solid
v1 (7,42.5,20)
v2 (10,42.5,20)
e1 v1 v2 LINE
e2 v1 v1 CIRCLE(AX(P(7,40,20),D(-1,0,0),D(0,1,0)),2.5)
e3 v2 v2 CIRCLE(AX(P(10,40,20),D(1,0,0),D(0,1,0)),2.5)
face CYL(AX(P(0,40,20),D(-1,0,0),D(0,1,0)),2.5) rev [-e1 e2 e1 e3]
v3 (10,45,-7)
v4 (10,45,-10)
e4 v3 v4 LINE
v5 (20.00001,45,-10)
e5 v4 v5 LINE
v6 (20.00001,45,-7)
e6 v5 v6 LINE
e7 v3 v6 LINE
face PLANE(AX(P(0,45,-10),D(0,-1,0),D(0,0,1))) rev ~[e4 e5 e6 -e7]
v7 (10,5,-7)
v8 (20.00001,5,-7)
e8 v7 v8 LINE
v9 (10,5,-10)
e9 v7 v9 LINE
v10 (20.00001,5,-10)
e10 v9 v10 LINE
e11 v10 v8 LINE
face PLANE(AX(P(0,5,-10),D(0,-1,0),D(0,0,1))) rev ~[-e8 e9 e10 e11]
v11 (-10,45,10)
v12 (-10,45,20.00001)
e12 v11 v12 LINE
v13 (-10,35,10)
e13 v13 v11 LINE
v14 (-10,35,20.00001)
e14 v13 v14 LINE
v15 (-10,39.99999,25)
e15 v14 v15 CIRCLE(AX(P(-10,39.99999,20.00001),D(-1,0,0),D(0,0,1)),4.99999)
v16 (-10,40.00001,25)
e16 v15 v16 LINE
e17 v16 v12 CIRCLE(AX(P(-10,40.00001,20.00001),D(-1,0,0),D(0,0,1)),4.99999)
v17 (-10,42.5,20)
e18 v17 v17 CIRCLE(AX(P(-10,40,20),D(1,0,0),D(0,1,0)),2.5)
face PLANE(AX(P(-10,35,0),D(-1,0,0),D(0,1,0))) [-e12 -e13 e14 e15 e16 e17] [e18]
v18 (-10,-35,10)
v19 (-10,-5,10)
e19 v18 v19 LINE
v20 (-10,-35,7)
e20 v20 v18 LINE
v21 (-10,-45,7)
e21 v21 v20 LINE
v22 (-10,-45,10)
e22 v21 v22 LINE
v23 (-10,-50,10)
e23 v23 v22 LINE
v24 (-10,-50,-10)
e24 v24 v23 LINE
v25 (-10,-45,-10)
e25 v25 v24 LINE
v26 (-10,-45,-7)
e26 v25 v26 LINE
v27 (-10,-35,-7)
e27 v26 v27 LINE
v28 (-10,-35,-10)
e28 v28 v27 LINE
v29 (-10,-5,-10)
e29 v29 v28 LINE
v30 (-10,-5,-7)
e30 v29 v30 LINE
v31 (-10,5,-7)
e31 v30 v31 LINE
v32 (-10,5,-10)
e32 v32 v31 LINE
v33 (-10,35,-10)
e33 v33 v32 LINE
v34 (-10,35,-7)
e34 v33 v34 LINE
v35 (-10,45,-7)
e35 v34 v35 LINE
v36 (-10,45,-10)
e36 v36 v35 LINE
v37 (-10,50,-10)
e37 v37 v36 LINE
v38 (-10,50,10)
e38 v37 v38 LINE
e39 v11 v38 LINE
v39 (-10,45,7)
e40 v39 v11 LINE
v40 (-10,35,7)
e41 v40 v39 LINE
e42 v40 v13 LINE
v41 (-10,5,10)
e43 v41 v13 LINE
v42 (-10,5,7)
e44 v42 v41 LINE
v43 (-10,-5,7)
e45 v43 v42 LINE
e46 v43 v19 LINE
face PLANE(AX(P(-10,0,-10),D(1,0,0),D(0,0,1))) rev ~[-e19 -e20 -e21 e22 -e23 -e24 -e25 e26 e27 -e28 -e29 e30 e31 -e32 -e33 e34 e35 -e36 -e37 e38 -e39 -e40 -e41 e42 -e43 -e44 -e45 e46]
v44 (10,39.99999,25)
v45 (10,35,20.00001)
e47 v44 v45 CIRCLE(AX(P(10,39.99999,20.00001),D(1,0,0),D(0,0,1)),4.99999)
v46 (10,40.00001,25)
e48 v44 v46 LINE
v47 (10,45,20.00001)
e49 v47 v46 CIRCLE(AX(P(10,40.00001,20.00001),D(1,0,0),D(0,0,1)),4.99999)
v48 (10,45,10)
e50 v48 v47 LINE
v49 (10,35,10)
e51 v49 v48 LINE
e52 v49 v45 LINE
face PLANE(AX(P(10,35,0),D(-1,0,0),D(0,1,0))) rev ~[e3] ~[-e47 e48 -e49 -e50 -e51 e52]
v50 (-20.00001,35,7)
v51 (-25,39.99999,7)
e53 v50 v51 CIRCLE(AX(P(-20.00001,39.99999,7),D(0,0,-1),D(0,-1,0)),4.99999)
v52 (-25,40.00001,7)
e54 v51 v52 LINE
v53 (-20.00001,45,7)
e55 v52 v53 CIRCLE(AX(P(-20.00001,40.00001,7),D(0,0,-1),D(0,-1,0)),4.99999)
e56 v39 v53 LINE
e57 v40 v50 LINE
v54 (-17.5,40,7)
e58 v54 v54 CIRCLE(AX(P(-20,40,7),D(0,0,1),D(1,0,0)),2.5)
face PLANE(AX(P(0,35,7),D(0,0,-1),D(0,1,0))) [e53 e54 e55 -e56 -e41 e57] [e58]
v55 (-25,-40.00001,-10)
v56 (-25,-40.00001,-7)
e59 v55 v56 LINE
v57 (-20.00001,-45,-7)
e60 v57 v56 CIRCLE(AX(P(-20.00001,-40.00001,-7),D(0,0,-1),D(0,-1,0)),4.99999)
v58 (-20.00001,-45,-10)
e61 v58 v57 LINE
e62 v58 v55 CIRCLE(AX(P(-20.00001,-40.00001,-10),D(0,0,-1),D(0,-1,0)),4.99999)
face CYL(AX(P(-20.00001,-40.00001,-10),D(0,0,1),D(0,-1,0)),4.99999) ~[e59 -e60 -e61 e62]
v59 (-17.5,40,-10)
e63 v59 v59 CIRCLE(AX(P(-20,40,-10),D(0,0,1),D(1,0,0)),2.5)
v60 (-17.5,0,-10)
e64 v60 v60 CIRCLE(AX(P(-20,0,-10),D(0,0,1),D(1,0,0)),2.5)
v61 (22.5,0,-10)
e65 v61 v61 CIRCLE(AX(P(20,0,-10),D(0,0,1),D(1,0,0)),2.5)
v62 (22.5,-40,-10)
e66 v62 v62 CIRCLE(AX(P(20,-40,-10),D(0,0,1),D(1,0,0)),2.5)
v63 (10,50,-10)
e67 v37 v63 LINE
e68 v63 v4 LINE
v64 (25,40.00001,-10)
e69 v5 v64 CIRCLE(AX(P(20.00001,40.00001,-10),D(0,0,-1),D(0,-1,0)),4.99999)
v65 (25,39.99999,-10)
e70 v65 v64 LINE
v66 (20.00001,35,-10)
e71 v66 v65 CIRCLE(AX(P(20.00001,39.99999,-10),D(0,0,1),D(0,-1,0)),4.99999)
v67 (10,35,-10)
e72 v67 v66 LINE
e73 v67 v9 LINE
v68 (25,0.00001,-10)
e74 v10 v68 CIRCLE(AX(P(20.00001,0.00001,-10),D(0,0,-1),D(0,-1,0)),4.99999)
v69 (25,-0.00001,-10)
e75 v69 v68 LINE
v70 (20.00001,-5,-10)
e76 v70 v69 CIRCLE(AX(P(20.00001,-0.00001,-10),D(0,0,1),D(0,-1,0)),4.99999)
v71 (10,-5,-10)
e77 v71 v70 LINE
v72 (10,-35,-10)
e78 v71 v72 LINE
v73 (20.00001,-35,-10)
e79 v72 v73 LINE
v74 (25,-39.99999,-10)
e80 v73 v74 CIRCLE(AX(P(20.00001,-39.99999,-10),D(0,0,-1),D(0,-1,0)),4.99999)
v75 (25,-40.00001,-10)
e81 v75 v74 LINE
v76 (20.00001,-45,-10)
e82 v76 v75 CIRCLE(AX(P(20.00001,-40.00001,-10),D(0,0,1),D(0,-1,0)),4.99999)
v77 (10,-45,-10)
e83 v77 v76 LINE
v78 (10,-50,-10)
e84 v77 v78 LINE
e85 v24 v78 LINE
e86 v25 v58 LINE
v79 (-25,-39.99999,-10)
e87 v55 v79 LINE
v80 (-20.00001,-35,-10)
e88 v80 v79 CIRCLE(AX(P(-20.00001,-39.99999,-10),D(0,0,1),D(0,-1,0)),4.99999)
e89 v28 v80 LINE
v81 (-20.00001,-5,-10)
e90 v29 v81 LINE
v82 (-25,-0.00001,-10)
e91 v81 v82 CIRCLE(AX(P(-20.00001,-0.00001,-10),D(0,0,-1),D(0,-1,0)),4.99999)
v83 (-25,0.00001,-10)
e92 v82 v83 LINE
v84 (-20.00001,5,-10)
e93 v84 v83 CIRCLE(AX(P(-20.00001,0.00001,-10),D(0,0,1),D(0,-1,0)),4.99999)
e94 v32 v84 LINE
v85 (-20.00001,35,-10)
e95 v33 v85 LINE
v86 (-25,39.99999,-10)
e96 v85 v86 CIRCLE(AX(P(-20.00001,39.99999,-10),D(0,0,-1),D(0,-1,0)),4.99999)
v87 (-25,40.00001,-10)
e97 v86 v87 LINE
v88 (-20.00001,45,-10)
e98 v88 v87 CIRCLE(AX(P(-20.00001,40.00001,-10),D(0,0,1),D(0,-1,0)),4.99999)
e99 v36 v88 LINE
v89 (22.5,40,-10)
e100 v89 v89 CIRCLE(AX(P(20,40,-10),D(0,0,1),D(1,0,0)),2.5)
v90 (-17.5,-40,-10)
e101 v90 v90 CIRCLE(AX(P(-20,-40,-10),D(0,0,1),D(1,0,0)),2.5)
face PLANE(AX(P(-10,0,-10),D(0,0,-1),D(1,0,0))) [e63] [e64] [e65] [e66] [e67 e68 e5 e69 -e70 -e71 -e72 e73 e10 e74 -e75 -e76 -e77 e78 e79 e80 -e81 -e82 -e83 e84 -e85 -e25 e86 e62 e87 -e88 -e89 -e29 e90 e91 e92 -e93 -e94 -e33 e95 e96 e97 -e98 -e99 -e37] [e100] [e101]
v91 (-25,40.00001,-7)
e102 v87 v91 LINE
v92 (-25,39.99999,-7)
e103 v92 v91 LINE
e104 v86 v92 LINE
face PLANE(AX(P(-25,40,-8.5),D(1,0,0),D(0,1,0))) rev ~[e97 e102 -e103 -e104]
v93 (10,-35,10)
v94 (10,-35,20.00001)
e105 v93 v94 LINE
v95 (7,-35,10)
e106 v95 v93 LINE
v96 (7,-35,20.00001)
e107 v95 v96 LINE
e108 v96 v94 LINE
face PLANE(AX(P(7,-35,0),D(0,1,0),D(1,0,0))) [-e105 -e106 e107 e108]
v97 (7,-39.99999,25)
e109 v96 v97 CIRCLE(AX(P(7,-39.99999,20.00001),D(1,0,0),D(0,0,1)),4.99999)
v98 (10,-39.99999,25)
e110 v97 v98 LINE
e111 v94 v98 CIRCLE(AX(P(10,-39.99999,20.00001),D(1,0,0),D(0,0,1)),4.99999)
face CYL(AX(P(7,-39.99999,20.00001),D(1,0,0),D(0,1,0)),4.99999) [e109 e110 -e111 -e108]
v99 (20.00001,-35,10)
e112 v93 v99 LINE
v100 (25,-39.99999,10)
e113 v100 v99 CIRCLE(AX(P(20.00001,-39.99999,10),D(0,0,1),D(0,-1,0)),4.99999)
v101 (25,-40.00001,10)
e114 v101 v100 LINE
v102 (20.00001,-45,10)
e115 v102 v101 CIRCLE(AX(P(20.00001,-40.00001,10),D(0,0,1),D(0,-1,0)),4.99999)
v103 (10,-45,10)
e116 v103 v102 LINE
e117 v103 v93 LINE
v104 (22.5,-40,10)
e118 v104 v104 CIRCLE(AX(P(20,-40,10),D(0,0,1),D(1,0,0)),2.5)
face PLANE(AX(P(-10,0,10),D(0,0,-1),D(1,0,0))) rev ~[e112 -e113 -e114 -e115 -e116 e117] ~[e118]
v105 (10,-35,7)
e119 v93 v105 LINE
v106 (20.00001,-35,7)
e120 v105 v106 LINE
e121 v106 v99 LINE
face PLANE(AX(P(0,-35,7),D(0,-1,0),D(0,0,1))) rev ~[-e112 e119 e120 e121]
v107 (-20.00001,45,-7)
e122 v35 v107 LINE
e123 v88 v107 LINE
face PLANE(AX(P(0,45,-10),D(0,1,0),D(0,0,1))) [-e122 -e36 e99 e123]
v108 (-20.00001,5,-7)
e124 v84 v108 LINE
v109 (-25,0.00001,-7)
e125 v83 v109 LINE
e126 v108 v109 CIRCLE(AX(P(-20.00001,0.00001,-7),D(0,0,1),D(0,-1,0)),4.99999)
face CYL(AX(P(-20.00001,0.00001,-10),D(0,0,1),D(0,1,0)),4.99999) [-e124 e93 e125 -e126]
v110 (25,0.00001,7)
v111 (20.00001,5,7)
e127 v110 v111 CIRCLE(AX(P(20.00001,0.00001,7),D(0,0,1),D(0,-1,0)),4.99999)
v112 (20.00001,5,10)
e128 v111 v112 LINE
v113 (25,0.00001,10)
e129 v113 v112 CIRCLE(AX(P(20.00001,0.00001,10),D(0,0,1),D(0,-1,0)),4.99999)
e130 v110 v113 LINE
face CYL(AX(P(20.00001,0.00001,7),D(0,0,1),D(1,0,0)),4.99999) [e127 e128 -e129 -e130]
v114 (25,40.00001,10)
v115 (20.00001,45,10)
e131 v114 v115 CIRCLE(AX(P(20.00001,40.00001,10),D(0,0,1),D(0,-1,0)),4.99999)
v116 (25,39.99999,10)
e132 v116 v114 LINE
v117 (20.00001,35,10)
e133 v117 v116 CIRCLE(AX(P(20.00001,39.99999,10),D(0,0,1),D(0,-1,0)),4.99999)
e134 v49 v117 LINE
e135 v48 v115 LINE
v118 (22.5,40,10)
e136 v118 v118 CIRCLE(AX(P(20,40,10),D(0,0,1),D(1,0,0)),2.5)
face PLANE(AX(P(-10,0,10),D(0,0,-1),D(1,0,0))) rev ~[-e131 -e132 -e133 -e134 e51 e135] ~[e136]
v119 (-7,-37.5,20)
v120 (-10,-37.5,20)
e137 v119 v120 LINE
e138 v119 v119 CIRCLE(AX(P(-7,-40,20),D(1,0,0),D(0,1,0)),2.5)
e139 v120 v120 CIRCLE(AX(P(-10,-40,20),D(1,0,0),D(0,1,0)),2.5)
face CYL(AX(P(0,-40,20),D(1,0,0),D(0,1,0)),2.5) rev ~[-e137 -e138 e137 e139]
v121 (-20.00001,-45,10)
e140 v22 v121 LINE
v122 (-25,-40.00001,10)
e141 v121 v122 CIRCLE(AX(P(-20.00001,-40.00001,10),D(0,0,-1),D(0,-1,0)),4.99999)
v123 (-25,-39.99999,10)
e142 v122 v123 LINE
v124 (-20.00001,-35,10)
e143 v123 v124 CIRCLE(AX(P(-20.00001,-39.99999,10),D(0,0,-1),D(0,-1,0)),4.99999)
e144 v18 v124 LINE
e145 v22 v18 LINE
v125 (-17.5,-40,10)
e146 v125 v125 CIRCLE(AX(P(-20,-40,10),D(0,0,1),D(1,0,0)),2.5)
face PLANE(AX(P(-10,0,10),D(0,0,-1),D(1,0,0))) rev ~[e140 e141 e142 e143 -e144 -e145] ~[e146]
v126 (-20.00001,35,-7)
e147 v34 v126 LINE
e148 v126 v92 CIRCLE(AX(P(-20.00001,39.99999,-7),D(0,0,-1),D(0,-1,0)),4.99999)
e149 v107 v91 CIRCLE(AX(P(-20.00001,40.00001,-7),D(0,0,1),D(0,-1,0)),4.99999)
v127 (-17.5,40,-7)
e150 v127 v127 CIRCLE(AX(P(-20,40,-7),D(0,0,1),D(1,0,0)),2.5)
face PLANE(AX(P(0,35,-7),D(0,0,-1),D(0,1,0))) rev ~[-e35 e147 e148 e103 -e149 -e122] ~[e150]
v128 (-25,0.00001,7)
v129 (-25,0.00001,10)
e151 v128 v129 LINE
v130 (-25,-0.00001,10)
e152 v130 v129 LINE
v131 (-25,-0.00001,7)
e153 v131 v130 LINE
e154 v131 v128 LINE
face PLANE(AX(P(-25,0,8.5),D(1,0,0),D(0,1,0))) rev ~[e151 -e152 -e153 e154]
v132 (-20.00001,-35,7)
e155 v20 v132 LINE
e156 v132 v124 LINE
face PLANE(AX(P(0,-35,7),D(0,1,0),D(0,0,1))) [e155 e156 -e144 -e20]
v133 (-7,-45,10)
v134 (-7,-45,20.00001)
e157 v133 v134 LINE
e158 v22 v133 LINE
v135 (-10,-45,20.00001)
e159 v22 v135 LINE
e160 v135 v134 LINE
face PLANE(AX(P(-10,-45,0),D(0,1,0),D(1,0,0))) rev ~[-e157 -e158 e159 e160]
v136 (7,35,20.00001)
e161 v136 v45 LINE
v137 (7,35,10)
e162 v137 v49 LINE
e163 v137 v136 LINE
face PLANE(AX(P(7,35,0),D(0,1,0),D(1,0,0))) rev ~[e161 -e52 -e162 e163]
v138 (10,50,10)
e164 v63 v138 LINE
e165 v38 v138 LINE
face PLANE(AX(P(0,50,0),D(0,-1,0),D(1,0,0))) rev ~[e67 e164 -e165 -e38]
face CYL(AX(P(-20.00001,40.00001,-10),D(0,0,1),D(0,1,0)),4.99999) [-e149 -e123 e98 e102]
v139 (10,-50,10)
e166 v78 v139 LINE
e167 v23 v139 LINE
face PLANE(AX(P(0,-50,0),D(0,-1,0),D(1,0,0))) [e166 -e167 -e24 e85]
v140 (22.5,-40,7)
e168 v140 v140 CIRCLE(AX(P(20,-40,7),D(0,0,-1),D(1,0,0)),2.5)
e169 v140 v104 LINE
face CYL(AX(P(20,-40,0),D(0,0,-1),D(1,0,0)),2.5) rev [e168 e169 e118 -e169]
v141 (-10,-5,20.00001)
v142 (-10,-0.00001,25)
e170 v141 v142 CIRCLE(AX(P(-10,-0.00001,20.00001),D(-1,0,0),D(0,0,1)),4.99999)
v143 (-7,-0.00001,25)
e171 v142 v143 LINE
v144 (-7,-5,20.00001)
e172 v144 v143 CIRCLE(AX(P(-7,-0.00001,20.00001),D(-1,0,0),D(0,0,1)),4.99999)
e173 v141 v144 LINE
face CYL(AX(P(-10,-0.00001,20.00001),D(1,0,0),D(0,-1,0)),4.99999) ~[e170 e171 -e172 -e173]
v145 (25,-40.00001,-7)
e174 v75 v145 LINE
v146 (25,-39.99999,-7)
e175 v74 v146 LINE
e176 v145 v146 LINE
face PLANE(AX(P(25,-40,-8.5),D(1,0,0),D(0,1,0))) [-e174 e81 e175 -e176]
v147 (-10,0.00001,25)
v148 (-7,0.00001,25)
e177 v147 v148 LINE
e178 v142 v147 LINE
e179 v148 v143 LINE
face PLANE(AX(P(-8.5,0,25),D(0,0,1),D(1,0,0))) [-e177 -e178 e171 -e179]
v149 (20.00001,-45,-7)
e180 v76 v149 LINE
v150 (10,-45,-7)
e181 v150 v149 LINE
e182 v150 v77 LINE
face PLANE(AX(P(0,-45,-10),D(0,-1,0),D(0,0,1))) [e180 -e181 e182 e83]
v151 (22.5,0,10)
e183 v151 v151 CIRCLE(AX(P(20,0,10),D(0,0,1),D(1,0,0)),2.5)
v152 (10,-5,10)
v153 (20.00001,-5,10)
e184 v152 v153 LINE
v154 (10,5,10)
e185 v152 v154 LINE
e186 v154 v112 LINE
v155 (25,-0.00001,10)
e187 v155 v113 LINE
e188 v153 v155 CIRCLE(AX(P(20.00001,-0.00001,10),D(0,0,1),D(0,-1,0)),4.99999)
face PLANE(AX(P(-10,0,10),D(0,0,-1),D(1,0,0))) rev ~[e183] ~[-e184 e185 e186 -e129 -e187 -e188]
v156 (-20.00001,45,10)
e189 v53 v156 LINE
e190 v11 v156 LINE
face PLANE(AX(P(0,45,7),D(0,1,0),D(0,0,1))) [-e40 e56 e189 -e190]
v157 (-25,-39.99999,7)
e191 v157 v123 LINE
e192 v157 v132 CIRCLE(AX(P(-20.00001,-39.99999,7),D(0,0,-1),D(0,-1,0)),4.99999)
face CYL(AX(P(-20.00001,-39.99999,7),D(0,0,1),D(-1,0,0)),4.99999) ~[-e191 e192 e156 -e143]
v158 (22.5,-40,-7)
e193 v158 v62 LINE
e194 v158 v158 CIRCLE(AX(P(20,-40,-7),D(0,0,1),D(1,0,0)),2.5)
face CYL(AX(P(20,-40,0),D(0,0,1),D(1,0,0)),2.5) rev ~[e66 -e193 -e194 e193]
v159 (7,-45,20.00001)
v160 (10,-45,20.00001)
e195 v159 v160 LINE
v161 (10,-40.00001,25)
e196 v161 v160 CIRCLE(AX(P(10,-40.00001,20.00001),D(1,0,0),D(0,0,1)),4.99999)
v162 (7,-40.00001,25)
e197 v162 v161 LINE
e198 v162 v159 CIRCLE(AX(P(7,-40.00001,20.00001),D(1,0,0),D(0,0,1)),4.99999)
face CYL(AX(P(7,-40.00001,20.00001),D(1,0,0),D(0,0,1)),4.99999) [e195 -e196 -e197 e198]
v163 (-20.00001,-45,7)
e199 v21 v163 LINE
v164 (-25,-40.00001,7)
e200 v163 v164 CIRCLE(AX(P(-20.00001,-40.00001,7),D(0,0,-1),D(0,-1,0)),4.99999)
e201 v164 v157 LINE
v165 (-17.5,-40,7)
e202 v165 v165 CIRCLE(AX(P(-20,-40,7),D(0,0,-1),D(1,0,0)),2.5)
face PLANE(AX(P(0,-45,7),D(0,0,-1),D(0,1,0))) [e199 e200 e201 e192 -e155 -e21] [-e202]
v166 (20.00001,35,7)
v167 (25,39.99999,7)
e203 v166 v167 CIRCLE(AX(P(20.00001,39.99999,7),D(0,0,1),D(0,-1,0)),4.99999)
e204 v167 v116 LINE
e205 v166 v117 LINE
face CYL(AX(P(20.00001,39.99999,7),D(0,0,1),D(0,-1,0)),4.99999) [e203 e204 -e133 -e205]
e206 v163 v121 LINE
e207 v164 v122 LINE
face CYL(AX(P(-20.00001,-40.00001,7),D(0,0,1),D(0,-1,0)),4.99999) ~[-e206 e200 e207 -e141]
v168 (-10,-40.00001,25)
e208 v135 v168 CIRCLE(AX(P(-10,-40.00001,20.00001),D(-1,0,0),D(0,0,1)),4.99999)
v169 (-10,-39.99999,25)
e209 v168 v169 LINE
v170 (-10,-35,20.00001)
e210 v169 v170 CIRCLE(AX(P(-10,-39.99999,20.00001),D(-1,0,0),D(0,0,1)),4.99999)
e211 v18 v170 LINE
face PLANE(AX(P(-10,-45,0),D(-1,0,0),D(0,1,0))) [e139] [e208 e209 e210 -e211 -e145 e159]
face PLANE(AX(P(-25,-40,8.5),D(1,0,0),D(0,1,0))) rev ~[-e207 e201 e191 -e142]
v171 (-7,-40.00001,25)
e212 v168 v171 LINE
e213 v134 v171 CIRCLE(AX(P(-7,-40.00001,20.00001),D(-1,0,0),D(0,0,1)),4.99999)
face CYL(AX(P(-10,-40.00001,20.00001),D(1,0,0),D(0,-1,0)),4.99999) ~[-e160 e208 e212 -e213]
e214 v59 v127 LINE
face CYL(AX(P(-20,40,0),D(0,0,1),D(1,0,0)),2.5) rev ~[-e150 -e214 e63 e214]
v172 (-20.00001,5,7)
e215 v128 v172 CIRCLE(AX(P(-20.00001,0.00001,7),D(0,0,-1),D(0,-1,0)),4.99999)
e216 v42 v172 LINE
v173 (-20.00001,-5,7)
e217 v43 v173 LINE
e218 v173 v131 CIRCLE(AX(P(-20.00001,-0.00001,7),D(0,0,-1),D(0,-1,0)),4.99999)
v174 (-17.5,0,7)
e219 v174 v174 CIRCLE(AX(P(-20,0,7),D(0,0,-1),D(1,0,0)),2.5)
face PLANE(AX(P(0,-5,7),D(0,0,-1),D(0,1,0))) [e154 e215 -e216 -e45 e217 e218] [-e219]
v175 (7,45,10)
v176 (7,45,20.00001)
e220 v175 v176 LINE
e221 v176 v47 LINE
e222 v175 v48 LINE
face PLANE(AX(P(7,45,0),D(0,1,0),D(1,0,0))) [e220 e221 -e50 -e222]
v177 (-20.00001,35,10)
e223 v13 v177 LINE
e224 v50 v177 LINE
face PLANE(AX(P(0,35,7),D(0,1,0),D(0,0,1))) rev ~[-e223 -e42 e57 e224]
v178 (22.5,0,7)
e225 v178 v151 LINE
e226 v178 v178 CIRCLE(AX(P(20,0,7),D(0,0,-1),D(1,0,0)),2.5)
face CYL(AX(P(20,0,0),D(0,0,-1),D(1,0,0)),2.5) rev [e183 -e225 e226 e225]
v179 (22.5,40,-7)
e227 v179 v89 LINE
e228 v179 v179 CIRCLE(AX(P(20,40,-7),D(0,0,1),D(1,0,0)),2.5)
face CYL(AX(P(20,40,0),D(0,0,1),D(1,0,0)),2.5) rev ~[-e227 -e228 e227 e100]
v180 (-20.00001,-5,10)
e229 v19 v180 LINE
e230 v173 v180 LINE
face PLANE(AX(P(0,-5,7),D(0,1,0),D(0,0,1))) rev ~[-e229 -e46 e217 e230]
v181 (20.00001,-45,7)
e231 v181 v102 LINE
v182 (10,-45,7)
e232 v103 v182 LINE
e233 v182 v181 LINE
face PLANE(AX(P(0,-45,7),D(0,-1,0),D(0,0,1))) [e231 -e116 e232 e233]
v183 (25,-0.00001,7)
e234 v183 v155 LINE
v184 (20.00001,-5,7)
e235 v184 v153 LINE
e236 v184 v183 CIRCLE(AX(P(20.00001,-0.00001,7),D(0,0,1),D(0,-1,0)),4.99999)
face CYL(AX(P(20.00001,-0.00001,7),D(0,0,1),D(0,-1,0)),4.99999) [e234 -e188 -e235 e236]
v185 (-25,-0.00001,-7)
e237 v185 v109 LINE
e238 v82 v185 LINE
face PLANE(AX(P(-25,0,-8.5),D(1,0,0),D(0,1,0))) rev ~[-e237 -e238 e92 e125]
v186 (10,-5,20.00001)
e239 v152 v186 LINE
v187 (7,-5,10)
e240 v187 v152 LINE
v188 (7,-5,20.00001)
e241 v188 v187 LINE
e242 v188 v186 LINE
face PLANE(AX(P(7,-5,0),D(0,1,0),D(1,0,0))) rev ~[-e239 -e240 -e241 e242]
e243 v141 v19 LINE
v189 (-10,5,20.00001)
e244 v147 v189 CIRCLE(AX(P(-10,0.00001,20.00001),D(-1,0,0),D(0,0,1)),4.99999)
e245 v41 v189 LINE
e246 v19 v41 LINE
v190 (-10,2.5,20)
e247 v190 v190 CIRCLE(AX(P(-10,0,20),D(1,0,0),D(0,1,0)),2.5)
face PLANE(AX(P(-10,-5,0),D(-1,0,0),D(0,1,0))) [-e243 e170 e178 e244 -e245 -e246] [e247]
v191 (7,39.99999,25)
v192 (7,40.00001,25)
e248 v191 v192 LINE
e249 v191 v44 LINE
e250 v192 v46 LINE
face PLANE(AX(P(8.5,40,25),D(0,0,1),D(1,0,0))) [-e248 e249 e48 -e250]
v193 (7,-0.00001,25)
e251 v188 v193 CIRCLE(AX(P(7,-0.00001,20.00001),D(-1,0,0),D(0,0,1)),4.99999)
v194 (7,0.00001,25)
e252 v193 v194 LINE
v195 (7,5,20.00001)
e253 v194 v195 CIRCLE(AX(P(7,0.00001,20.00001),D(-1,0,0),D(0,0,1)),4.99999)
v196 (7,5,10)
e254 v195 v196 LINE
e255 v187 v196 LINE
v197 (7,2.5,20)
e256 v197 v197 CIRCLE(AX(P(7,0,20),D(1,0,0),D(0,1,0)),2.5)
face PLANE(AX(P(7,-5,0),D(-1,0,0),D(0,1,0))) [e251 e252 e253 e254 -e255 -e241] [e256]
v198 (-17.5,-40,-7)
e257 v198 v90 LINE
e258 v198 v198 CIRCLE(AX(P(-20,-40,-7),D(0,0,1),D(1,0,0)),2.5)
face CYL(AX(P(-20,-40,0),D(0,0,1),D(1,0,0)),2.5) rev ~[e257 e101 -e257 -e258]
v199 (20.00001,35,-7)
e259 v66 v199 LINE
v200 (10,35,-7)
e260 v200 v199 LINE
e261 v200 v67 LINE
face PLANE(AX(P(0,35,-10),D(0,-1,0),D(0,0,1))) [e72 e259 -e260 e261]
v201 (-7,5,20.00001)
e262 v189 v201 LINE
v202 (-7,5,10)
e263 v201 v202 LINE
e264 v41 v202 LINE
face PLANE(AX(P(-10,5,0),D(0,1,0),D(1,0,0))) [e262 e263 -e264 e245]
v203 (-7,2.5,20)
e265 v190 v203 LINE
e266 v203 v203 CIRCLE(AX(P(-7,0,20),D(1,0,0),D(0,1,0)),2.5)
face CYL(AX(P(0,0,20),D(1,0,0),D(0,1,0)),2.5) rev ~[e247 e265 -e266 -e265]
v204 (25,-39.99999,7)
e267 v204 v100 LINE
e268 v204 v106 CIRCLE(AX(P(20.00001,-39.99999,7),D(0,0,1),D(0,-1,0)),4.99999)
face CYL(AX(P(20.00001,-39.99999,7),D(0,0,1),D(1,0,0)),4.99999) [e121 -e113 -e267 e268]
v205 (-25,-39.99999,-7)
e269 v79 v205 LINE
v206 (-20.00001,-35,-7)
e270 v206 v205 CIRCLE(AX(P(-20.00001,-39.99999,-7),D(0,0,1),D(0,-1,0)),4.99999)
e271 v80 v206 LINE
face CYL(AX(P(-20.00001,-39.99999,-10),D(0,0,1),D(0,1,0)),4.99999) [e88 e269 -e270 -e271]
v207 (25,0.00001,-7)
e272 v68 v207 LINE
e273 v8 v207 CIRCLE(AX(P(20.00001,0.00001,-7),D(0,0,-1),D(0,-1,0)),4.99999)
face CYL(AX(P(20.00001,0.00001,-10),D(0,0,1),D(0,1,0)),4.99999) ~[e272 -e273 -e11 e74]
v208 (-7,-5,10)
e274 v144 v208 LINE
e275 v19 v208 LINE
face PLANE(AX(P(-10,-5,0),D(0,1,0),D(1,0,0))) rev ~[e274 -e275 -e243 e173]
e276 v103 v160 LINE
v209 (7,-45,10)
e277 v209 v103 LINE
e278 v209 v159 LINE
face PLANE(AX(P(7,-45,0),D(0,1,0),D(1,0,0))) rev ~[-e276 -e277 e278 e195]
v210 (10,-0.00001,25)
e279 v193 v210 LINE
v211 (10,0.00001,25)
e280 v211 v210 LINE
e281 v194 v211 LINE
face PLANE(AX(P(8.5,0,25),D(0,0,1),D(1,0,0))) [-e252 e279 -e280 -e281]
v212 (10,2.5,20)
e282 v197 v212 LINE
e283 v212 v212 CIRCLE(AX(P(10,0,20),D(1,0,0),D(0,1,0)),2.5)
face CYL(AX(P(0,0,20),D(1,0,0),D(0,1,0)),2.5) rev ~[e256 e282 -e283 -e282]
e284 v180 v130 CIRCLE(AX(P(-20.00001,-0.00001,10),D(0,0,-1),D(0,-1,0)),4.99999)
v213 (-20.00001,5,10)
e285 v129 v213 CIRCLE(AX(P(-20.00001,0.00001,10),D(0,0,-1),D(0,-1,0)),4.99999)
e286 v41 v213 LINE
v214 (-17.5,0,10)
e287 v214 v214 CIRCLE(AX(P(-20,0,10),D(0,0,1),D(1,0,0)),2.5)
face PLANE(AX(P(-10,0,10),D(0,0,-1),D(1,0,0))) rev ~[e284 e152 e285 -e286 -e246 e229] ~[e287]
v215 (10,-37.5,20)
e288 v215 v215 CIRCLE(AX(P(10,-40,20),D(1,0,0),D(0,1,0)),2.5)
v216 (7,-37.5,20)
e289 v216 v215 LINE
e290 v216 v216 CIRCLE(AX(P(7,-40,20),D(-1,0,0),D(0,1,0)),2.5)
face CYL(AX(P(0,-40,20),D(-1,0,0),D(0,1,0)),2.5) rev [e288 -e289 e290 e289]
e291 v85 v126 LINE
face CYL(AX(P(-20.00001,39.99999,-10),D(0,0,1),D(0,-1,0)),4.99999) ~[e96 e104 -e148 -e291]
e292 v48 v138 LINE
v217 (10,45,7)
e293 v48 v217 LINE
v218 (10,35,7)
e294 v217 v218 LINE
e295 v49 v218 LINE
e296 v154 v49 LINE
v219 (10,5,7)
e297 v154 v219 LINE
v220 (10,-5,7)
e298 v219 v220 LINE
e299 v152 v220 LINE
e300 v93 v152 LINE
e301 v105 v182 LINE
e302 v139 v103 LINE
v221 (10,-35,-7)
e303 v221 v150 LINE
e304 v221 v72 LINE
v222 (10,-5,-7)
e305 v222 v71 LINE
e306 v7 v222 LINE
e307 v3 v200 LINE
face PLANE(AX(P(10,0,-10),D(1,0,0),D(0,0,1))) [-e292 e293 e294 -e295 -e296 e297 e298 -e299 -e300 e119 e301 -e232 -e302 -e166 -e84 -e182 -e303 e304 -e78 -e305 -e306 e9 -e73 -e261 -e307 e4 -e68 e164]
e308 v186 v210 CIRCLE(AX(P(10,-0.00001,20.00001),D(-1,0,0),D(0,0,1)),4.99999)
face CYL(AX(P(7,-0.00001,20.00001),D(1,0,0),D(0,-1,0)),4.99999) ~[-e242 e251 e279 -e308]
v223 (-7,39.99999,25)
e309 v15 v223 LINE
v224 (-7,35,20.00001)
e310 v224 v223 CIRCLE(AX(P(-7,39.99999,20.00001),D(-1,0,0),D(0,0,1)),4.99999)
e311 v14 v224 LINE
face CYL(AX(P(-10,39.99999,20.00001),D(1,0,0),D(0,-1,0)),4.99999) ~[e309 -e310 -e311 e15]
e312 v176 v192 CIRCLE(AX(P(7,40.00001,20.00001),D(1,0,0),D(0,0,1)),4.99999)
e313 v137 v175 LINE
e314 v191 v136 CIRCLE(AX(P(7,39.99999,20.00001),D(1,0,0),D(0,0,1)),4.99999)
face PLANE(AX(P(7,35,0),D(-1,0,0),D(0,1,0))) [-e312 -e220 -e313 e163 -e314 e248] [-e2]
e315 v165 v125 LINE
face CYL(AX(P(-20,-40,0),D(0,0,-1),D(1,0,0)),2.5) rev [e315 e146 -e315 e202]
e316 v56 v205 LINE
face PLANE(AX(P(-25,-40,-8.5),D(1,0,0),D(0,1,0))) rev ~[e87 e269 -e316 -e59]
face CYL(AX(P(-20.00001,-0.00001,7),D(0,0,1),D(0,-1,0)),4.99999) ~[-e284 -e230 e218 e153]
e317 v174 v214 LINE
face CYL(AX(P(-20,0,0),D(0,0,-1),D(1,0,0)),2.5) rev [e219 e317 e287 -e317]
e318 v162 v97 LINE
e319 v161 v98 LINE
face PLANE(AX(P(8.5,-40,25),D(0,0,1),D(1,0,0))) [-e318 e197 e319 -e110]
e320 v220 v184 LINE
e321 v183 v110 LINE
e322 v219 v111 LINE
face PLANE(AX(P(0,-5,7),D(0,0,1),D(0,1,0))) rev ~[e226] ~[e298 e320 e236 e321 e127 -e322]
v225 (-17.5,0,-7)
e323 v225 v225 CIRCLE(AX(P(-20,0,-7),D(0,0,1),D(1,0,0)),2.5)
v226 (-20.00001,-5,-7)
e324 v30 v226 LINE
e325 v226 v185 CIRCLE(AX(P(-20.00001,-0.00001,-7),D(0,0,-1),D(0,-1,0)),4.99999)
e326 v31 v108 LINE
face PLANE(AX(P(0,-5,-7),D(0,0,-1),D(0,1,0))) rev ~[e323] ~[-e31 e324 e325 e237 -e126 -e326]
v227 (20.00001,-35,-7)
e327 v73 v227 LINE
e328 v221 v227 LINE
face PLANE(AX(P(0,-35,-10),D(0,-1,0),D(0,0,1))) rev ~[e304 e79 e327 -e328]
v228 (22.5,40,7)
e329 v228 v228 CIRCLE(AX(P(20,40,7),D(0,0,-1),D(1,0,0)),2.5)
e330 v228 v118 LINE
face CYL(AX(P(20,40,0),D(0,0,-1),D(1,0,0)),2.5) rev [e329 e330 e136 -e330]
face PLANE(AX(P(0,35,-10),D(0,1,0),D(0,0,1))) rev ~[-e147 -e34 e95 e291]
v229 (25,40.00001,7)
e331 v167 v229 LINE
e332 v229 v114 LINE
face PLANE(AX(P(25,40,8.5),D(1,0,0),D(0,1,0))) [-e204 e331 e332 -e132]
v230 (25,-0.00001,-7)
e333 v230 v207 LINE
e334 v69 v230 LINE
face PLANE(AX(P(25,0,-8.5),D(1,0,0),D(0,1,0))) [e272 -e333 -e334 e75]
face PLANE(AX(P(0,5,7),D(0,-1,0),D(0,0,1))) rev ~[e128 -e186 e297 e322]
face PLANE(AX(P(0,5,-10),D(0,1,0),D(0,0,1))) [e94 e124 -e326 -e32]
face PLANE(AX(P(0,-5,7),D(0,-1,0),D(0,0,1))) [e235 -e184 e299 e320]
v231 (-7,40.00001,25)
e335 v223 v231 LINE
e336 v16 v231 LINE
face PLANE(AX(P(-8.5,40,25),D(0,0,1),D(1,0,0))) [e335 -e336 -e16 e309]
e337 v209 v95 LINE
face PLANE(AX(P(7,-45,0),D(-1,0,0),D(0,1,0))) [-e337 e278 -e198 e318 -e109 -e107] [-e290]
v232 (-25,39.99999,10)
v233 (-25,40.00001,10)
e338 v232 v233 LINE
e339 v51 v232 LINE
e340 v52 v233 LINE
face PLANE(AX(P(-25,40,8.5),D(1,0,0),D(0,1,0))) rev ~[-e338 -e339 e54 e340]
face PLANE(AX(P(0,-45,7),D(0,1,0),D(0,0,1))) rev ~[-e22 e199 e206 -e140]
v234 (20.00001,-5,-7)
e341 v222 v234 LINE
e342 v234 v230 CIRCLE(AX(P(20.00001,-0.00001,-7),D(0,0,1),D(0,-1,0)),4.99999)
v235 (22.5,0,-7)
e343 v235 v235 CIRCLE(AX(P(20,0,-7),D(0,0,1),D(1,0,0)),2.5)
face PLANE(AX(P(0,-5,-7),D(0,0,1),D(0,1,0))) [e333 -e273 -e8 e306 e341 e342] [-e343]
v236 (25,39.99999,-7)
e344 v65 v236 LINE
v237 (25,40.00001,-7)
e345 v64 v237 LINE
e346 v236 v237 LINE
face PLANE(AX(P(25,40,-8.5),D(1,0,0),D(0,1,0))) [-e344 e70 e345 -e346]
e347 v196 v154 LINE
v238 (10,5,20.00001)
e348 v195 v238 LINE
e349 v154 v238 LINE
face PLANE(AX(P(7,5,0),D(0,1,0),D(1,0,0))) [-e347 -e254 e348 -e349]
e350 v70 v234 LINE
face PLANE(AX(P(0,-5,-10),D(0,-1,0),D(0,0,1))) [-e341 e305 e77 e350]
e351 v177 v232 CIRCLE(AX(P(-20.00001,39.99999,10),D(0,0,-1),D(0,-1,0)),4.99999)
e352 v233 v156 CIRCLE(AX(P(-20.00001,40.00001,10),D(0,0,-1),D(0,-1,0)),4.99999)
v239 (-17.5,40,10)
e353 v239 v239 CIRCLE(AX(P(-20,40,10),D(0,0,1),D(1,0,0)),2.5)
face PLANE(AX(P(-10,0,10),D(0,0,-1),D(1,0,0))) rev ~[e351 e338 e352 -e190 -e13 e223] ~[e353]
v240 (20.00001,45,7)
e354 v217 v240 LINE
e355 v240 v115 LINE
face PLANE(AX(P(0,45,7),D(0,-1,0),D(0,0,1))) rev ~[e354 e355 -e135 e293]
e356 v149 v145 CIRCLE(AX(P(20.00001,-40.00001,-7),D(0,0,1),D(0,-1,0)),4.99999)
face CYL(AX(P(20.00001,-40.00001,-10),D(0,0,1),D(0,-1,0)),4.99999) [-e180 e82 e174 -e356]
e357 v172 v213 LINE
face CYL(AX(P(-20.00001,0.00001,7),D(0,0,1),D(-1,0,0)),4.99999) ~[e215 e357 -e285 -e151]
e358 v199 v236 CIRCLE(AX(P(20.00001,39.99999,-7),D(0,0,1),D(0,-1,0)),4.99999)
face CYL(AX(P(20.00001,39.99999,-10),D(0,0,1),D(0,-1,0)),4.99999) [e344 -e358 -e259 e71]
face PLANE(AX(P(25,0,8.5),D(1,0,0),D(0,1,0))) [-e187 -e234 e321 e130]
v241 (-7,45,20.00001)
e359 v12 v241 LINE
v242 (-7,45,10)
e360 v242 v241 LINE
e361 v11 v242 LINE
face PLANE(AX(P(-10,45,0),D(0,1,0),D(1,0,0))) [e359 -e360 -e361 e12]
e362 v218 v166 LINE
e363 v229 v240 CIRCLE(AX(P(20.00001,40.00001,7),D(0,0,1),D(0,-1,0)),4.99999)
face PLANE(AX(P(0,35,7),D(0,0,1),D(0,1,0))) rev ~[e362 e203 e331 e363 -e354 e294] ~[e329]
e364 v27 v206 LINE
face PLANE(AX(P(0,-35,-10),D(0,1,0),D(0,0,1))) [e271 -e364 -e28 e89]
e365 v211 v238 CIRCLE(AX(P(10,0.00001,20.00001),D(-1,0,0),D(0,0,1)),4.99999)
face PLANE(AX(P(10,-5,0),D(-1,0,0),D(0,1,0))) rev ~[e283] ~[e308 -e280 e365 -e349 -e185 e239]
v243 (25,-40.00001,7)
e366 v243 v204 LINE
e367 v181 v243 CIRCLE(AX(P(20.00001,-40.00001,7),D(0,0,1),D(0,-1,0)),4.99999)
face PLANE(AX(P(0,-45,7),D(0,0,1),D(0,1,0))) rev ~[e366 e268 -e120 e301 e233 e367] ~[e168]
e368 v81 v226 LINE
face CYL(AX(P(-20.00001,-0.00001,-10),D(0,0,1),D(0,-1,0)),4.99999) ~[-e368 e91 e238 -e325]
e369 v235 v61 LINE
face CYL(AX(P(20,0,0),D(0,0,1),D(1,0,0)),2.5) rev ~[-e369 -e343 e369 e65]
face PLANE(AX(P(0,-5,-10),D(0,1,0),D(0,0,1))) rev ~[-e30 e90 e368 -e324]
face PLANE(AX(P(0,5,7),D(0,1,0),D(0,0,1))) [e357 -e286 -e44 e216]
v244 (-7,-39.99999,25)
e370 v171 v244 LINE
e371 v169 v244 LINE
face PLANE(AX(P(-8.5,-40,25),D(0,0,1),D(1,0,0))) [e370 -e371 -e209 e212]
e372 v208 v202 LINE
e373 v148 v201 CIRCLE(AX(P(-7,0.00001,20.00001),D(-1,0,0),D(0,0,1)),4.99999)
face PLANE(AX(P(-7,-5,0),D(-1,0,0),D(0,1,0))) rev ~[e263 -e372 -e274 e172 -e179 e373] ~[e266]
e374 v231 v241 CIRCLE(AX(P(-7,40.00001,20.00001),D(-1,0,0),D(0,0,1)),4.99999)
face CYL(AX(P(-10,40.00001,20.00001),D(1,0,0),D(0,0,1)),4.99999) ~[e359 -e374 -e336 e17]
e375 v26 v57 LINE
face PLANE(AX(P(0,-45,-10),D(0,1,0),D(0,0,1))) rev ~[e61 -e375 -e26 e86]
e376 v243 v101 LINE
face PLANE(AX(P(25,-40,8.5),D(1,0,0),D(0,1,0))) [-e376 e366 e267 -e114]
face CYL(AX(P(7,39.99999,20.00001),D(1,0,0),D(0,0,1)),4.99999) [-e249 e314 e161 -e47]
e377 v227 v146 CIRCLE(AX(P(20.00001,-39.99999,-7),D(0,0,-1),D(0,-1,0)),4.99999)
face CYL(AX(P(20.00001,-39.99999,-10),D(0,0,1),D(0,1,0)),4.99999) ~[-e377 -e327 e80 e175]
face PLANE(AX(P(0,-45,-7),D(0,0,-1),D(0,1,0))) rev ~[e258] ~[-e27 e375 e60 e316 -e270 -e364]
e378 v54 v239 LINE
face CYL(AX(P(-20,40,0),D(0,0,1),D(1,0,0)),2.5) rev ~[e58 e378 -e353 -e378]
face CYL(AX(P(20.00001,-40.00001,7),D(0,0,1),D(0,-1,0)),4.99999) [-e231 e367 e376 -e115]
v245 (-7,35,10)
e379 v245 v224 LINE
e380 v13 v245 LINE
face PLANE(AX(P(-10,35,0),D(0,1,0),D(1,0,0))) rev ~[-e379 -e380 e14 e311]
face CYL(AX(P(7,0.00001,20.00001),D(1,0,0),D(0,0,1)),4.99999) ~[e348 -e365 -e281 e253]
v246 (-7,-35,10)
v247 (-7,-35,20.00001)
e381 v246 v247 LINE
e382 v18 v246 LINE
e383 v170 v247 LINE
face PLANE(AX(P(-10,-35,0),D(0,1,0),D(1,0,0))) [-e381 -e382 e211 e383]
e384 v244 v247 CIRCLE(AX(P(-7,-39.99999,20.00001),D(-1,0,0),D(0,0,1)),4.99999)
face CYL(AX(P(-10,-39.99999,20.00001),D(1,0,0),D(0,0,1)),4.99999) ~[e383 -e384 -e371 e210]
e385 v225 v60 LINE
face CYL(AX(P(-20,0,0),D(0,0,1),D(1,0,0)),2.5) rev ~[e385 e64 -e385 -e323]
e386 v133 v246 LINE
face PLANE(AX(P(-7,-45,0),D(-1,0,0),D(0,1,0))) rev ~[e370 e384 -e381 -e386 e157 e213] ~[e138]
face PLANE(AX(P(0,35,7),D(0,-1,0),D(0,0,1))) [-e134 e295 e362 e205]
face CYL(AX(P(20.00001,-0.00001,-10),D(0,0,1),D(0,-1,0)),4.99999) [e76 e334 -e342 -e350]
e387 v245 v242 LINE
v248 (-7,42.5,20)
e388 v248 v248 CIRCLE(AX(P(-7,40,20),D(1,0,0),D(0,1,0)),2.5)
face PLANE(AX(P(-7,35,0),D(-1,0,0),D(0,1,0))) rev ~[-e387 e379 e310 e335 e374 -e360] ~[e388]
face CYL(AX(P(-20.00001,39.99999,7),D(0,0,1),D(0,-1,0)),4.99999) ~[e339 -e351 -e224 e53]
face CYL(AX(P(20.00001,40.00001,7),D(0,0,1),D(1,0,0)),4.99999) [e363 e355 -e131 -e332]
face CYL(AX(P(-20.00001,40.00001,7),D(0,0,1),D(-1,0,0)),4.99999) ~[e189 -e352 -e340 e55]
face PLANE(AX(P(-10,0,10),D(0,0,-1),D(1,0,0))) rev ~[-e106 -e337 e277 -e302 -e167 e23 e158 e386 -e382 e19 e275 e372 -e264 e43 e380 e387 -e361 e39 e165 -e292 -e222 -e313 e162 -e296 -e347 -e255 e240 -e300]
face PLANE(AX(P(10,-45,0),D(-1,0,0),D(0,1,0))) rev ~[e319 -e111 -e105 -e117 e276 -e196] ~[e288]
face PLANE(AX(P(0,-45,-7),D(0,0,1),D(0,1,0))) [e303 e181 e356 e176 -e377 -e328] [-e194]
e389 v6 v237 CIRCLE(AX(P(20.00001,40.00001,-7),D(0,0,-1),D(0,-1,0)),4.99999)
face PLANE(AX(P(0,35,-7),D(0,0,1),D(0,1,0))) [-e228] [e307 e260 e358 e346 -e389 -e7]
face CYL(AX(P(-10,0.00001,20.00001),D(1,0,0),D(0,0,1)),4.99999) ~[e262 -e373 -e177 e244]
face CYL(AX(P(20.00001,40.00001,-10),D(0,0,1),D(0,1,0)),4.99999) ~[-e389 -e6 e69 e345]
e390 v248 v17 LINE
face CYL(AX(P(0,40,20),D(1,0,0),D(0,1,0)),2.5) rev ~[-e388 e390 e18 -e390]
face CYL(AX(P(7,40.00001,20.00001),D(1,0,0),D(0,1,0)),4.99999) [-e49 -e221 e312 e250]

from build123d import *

# Parameters (mm, degrees)
F0_W          = 20
F0_H          = 20
F1_DEPTH      = 50
F2_W          = 10
F2_H          = 3
F3_DEPTH      = 25
F3_DEPTH_BACK = 25
F4_R          = 4.99999
F5_R          = 2.5
F6_DEPTH      = 10
F7_R          = 4.99999
F8_W          = 3
F8_H          = 10
F9_DEPTH      = 25
F10_R         = 4.99999
F12_DEPTH     = 25
F13_R         = 4.99999
F11_R         = 2.5
F14_DEPTH     = 10


# Not quite as in the source:
# - a fillet or chamfer is up to 0.001 mm smaller than in the source, because OpenCascade refuses the exact size
# - a feature names something its author has since deleted; it is built from what else it names


with BuildPart() as f1:
    # F0 (on Front) → F1 (new body, symmetric)
    with BuildSketch(Plane.XZ):
        Rectangle(F0_W, F0_H)
    extrude(amount=F1_DEPTH, both=True)

    # F2 (on Right) → F3 (join, two sides)
    with BuildSketch(Plane.YZ) as f3_sk:
        with Locations((-40, 8.5)):
            Rectangle(F2_W, F2_H)
        with Locations((-40, -8.5)):
            Rectangle(F2_W, F2_H)
        with Locations((40, -8.5)):
            Rectangle(F2_W, F2_H)
        with Locations((40, 8.5)):
            Rectangle(F2_W, F2_H)
        with Locations((0, 8.5)):
            Rectangle(F2_W, F2_H)
        with Locations((0, -8.5)):
            Rectangle(F2_W, F2_H)
    extrude(amount=F3_DEPTH)
    extrude(f3_sk.sketch, amount=-F3_DEPTH_BACK)

    # F4 (radius 5 in the source; OpenCascade refuses exactly that, so slightly less here)
    f4_edges = [f1.edges().sort_by_distance(p)[0] for p in [
        (25, -45, 8.5),
        (25, -35, 8.5),
        (25, -45, -8.5),
        (25, -35, -8.5),
        (25, -5, 8.5),
        (25, 5, 8.5),
        (25, -5, -8.5),
        (25, 5, -8.5),
        (25, 35, 8.5),
        (25, 45, 8.5),
        (25, 35, -8.5),
        (25, 45, -8.5),
    ]]
    fillet(f4_edges, radius=F4_R)

    # F5 (on Top) → F6 (cut, symmetric)
    with BuildSketch(Plane.XY):
        with Locations((20, -40)):
            Circle(F5_R)
        with Locations((20, 40)):
            Circle(F5_R)
        with Locations((20, 0)):
            Circle(F5_R)
        with Locations((-20, -40)):
            Circle(F5_R)
        with Locations((-20, 0)):
            Circle(F5_R)
        with Locations((-20, 40)):
            Circle(F5_R)
    extrude(amount=F6_DEPTH, both=True, mode=Mode.SUBTRACT)

    # F7 (radius 5 in the source; OpenCascade refuses exactly that, so slightly less here)
    f7_edges = [f1.edges().sort_by_distance(p)[0] for p in [
        (-25, -45, -8.5),
        (-25, -35, -8.5),
        (-25, -45, 8.5),
        (-25, -35, 8.5),
        (-25, -5, -8.5),
        (-25, 5, -8.5),
        (-25, -5, 8.5),
        (-25, 5, 8.5),
        (-25, 35, -8.5),
        (-25, 45, -8.5),
        (-25, 35, 8.5),
        (-25, 45, 8.5),
    ]]
    fillet(f7_edges, radius=F7_R)

    # F8 (on Top) → F9 (join)
    with BuildSketch(Plane.XY):
        with Locations((8.5, 0)):
            Rectangle(F8_W, F8_H)
        with Locations((-8.5, 0)):
            Rectangle(F8_W, F8_H)
        with Locations((8.5, 40)):
            Rectangle(F8_W, F8_H)
        with Locations((-8.5, 40)):
            Rectangle(F8_W, F8_H)
        with Locations((-8.5, -40)):
            Rectangle(F8_W, F8_H)
        with Locations((8.5, -40)):
            Rectangle(F8_W, F8_H)
    extrude(amount=F9_DEPTH)

    # F10 (radius 5 in the source; OpenCascade refuses exactly that, so slightly less here)
    f10_edges = [f1.edges().sort_by_distance(p)[0] for p in [
        (8.5, -5, 25),
        (8.5, 5, 25),
        (-8.5, -5, 25),
        (-8.5, 5, 25),
    ]]
    fillet(f10_edges, radius=F10_R)

    # F8 (on Top) → F12 (join)
    with BuildSketch(Plane.XY):
        with Locations((8.5, 0)):
            Rectangle(F8_W, F8_H)
        with Locations((-8.5, 0)):
            Rectangle(F8_W, F8_H)
        with Locations((8.5, 40)):
            Rectangle(F8_W, F8_H)
        with Locations((-8.5, 40)):
            Rectangle(F8_W, F8_H)
        with Locations((-8.5, -40)):
            Rectangle(F8_W, F8_H)
        with Locations((8.5, -40)):
            Rectangle(F8_W, F8_H)
    extrude(amount=F12_DEPTH)

    # F13 (radius 5 in the source; OpenCascade refuses exactly that, so slightly less here)
    f13_edges = [f1.edges().sort_by_distance(p)[0] for p in [
        (8.5, 45, 25),
        (-8.5, 45, 25),
        (-8.5, 35, 25),
        (8.5, 35, 25),
        (8.5, 5, 25),
        (8.5, -5, 25),
        (-8.5, 5, 25),
        (-8.5, -5, 25),
        (8.5, -35, 25),
        (8.5, -45, 25),
        (-8.5, -35, 25),
        (-8.5, -45, 25),
    ]]
    fillet(f13_edges, radius=F13_R)

    # F11 (on Right) → F14 (cut, symmetric)
    with BuildSketch(Plane.YZ):
        with Locations((-40, 20)):
            Circle(F11_R)
        with Locations((40, 20)):
            Circle(F11_R)
        with Locations((0, 20)):
            Circle(F11_R)
    extrude(amount=F14_DEPTH, both=True, mode=Mode.SUBTRACT)


solid = f1.part
